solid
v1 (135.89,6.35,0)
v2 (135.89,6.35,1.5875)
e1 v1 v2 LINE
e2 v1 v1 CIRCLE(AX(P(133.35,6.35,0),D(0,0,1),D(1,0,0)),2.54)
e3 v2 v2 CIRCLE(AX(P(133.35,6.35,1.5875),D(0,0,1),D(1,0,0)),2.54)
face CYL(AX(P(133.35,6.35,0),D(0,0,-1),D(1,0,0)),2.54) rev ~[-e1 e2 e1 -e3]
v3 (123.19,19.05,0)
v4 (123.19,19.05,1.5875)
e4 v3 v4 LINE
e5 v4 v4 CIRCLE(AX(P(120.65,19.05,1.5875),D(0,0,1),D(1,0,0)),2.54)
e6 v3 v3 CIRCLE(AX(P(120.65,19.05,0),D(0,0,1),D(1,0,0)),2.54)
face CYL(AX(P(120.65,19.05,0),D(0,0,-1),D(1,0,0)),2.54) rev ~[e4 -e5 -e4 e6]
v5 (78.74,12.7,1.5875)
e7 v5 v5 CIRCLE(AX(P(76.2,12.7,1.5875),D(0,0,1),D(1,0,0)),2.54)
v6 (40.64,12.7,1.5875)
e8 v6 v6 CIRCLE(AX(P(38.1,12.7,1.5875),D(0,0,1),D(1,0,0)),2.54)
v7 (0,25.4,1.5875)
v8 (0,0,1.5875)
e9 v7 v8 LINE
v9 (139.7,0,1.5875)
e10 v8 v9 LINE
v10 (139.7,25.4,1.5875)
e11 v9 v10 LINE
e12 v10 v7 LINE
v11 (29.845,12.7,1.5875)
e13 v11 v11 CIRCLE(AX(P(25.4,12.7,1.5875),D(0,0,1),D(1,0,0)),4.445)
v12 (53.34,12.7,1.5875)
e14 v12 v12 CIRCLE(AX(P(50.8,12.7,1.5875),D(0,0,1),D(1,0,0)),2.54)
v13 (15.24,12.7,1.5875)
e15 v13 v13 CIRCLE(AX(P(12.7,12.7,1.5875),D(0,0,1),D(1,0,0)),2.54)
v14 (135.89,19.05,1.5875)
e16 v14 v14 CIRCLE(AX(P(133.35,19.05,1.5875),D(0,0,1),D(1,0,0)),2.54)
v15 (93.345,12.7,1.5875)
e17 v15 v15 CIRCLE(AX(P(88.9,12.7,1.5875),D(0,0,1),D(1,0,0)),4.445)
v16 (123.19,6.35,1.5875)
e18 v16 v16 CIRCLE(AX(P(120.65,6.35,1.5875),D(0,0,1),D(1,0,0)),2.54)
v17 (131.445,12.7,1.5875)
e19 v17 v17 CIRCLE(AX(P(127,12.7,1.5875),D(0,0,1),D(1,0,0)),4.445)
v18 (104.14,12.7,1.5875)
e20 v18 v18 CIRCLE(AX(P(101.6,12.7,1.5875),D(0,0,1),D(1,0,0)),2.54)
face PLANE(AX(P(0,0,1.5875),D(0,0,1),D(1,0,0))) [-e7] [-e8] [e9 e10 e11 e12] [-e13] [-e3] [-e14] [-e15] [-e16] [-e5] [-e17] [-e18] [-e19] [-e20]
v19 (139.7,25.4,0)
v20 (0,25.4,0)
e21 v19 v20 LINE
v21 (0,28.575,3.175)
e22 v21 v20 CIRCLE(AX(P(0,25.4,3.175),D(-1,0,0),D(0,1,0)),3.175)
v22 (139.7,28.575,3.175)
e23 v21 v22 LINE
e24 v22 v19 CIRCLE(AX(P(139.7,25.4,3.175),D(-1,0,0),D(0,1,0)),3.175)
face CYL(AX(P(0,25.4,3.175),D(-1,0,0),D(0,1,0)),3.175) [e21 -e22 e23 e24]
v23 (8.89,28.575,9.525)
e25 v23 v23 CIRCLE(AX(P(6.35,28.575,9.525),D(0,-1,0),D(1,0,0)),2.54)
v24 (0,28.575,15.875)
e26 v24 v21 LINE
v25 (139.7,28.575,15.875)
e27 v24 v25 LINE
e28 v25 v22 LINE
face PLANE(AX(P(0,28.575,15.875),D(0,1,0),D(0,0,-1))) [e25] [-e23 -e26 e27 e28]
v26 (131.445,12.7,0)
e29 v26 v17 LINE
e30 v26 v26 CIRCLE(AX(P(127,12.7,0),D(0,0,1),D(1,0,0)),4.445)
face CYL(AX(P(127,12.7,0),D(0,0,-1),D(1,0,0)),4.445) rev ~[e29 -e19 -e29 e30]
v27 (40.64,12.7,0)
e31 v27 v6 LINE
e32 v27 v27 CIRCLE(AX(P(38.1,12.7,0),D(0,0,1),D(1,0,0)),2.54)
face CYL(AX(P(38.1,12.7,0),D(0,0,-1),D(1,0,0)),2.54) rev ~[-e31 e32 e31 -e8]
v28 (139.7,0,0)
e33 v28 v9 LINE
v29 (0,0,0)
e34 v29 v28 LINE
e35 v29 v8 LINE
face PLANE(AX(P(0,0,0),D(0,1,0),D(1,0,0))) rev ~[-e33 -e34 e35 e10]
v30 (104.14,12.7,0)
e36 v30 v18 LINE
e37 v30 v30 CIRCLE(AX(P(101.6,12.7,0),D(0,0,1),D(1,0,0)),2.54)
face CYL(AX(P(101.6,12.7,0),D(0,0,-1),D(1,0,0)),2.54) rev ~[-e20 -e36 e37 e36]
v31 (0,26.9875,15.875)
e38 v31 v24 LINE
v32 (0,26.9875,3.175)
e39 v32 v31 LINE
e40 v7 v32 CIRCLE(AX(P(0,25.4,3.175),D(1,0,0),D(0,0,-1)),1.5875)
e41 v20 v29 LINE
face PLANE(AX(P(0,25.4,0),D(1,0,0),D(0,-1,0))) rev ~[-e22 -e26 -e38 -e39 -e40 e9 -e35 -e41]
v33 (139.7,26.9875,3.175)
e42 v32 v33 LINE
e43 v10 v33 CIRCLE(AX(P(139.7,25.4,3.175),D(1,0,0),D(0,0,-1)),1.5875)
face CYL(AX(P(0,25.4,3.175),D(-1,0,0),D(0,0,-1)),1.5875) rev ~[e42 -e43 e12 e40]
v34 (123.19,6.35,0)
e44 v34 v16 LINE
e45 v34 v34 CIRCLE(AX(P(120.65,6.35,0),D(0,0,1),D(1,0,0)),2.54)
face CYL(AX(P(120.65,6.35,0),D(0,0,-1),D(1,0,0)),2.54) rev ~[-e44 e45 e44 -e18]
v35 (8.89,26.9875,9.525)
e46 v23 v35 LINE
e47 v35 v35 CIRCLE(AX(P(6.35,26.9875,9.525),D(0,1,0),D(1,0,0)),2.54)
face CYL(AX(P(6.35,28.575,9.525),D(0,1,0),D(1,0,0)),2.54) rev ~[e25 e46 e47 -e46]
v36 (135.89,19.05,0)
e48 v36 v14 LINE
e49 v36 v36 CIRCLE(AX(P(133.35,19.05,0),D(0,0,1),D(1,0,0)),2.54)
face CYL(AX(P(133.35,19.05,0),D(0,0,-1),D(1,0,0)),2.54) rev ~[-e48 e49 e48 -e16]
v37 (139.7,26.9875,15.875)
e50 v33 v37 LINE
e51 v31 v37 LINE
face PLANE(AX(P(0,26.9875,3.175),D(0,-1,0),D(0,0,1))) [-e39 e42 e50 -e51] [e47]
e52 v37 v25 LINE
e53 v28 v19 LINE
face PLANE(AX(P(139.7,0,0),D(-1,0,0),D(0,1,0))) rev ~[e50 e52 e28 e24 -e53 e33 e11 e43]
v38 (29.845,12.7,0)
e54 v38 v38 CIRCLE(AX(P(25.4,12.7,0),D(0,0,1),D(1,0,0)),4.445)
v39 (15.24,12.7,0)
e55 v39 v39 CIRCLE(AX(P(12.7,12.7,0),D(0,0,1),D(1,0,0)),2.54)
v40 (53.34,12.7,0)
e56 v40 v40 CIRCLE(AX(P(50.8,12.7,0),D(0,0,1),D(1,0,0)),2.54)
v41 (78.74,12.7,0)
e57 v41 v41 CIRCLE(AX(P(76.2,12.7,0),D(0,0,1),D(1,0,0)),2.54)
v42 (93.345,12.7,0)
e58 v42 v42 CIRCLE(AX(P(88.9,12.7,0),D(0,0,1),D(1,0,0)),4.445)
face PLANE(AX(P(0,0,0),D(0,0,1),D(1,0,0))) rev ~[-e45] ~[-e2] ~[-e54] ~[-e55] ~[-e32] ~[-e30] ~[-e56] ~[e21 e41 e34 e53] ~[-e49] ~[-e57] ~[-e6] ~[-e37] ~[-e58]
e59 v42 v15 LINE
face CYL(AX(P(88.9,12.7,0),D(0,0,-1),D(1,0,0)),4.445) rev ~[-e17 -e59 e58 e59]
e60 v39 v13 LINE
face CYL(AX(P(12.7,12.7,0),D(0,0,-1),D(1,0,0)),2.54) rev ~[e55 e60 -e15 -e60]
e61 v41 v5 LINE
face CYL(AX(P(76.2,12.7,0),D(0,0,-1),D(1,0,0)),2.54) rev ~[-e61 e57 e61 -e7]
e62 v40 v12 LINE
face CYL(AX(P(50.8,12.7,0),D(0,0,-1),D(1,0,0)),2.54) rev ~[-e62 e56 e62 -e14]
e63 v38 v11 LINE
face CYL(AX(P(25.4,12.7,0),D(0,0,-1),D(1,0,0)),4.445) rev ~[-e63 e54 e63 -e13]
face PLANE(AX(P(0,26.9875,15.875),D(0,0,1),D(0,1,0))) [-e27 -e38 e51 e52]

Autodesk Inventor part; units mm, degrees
ref_plane "YZ Plane" through (0, 0, 0) normal (1, 0, 0) x (0, 1, 0)
ref_plane "XZ Plane" through (0, 0, 0) normal (0, 1, 0) x (-1, 0, 0)
ref_plane "XY Plane" through (0, 0, 0) normal (0, 0, 1) x (1, 0, 0)
sketch "Sketch1" plane through (0, 0, 0) normal (0, 0, 1) x (1, 0, 0)
  line L0 (0, 0) -> (139.7, 0)
  line L1 (139.7, 0) -> (139.7, 25.4)
  line L2 (139.7, 25.4) -> (0, 25.4)
  line L3 (0, 25.4) -> (0, 0)
  circle A0 centre (12.7, 12.7) radius 2.54
  circle A1 centre (25.4, 12.7) radius 4.445
  circle A2 centre (38.1, 12.7) radius 2.54
  circle A3 centre (50.8, 12.7) radius 2.54
  circle A4 centre (76.2, 12.7) radius 2.54
  circle A5 centre (88.9, 12.7) radius 4.445
  circle A6 centre (101.6, 12.7) radius 2.54
  circle A7 centre (127, 12.7) radius 4.445
  circle A8 centre (133.35, 6.35) radius 2.54
  circle A9 centre (120.65, 19.05) radius 2.54
  circle A10 centre (133.35, 19.05) radius 2.54
  circle A11 centre (120.65, 6.35) radius 2.54
  dimension "d0" = 139.7
  dimension "d1" = 25.4
  dimension "d9" = 5.08
  dimension "d11" = 8.89
  dimension "d13" = 5.08
  dimension "d15" = 5.08
  dimension "d17" = 5.08
  dimension "d19" = 8.89
  dimension "d21" = 5.08
  dimension "d23" = 8.89
  dimension "d39" = 5.08
  dimension "d42" = 5.08
  dimension "d43" = 5.08
  dimension "d44" = 5.08
extrude "Plate4" add sketch "Sketch1" along normal blind 1.5875
sketch "Sketch6" plane through (0, 26.9875, 3.175) normal (0, 1, 0) x (-1, 0, 0)
  line L0 (-139.7, 0) -> (0, 0)
  line L1 (0, 0) -> (0, 12.7)
  line L2 (0, 12.7) -> (-139.7, 12.7)
  line L3 (-139.7, 12.7) -> (-139.7, 0)
edge flange "Flange2" height 15.875 angle 90 thickness 1.5875 bend radius 1.5875 thickness toward (0, 1, 0) relief tear relief width 1.5875 relief depth 0.7937 edges at (69.85, 25.4, 1.5875) wall of the first edge with corners at (139.7, 26.9875, 3.175) (0, 26.9875, 3.175) (0, 26.9875, 15.875) (139.7, 26.9875, 15.875)
bend "Bend2"
corner "Corner2"
sketch "Sketch8" plane through (0, 28.575, 15.875) normal (0, 1, 0) x (1, 0, 0)
  line L0 (139.7, 12.7) -> (0, 12.7) projected
  line L1 (0, 12.7) -> (0, 6.35)
  line L2 (0, 0) -> (0, 12.7) projected
  line L3 (0, 6.35) -> (6.35, 6.35)
  circle A0 centre (6.35, 6.35) radius 2.54
  point P0 (0, 15.875)
  dimension "d69" = 6.35
  dimension "d70" = 5.08
extrude "Extrusion1" cut sketch "Sketch8" against normal blind 1.5875
equation "\"d58\" = Thickness"
equation "\"d59\" = BendReliefWidth"
equation "\"d60\" = BendReliefDepth"
equation "\"d61\" = MinimumRemnant"
equation "\"d62\" = TransitionRadius"
equation "\"d65\" = BendRadius"
equation "\"d66\" = CornerReliefSize"
equation "\"d67\" = GapSize"
equation "\"d68\" = JacobiRadiusSize"
equation "\"BendRadius\" = Thickness"
equation "\"BendReliefWidth\" = Thickness"
equation "\"BendReliefDepth\" = 0.5 * Thickness"
equation "\"CornerReliefSize\" = 4 * Thickness"
equation "\"MinimumRemnant\" = 2 * Thickness"
equation "\"TransitionRadius\" = BendRadius"
equation "\"JacobiRadiusSize\" = BendRadius"
equation "\"GapSize\" = Thickness"
equation "\"Thickness\" = 1.5875"
properties part number "poly1"
